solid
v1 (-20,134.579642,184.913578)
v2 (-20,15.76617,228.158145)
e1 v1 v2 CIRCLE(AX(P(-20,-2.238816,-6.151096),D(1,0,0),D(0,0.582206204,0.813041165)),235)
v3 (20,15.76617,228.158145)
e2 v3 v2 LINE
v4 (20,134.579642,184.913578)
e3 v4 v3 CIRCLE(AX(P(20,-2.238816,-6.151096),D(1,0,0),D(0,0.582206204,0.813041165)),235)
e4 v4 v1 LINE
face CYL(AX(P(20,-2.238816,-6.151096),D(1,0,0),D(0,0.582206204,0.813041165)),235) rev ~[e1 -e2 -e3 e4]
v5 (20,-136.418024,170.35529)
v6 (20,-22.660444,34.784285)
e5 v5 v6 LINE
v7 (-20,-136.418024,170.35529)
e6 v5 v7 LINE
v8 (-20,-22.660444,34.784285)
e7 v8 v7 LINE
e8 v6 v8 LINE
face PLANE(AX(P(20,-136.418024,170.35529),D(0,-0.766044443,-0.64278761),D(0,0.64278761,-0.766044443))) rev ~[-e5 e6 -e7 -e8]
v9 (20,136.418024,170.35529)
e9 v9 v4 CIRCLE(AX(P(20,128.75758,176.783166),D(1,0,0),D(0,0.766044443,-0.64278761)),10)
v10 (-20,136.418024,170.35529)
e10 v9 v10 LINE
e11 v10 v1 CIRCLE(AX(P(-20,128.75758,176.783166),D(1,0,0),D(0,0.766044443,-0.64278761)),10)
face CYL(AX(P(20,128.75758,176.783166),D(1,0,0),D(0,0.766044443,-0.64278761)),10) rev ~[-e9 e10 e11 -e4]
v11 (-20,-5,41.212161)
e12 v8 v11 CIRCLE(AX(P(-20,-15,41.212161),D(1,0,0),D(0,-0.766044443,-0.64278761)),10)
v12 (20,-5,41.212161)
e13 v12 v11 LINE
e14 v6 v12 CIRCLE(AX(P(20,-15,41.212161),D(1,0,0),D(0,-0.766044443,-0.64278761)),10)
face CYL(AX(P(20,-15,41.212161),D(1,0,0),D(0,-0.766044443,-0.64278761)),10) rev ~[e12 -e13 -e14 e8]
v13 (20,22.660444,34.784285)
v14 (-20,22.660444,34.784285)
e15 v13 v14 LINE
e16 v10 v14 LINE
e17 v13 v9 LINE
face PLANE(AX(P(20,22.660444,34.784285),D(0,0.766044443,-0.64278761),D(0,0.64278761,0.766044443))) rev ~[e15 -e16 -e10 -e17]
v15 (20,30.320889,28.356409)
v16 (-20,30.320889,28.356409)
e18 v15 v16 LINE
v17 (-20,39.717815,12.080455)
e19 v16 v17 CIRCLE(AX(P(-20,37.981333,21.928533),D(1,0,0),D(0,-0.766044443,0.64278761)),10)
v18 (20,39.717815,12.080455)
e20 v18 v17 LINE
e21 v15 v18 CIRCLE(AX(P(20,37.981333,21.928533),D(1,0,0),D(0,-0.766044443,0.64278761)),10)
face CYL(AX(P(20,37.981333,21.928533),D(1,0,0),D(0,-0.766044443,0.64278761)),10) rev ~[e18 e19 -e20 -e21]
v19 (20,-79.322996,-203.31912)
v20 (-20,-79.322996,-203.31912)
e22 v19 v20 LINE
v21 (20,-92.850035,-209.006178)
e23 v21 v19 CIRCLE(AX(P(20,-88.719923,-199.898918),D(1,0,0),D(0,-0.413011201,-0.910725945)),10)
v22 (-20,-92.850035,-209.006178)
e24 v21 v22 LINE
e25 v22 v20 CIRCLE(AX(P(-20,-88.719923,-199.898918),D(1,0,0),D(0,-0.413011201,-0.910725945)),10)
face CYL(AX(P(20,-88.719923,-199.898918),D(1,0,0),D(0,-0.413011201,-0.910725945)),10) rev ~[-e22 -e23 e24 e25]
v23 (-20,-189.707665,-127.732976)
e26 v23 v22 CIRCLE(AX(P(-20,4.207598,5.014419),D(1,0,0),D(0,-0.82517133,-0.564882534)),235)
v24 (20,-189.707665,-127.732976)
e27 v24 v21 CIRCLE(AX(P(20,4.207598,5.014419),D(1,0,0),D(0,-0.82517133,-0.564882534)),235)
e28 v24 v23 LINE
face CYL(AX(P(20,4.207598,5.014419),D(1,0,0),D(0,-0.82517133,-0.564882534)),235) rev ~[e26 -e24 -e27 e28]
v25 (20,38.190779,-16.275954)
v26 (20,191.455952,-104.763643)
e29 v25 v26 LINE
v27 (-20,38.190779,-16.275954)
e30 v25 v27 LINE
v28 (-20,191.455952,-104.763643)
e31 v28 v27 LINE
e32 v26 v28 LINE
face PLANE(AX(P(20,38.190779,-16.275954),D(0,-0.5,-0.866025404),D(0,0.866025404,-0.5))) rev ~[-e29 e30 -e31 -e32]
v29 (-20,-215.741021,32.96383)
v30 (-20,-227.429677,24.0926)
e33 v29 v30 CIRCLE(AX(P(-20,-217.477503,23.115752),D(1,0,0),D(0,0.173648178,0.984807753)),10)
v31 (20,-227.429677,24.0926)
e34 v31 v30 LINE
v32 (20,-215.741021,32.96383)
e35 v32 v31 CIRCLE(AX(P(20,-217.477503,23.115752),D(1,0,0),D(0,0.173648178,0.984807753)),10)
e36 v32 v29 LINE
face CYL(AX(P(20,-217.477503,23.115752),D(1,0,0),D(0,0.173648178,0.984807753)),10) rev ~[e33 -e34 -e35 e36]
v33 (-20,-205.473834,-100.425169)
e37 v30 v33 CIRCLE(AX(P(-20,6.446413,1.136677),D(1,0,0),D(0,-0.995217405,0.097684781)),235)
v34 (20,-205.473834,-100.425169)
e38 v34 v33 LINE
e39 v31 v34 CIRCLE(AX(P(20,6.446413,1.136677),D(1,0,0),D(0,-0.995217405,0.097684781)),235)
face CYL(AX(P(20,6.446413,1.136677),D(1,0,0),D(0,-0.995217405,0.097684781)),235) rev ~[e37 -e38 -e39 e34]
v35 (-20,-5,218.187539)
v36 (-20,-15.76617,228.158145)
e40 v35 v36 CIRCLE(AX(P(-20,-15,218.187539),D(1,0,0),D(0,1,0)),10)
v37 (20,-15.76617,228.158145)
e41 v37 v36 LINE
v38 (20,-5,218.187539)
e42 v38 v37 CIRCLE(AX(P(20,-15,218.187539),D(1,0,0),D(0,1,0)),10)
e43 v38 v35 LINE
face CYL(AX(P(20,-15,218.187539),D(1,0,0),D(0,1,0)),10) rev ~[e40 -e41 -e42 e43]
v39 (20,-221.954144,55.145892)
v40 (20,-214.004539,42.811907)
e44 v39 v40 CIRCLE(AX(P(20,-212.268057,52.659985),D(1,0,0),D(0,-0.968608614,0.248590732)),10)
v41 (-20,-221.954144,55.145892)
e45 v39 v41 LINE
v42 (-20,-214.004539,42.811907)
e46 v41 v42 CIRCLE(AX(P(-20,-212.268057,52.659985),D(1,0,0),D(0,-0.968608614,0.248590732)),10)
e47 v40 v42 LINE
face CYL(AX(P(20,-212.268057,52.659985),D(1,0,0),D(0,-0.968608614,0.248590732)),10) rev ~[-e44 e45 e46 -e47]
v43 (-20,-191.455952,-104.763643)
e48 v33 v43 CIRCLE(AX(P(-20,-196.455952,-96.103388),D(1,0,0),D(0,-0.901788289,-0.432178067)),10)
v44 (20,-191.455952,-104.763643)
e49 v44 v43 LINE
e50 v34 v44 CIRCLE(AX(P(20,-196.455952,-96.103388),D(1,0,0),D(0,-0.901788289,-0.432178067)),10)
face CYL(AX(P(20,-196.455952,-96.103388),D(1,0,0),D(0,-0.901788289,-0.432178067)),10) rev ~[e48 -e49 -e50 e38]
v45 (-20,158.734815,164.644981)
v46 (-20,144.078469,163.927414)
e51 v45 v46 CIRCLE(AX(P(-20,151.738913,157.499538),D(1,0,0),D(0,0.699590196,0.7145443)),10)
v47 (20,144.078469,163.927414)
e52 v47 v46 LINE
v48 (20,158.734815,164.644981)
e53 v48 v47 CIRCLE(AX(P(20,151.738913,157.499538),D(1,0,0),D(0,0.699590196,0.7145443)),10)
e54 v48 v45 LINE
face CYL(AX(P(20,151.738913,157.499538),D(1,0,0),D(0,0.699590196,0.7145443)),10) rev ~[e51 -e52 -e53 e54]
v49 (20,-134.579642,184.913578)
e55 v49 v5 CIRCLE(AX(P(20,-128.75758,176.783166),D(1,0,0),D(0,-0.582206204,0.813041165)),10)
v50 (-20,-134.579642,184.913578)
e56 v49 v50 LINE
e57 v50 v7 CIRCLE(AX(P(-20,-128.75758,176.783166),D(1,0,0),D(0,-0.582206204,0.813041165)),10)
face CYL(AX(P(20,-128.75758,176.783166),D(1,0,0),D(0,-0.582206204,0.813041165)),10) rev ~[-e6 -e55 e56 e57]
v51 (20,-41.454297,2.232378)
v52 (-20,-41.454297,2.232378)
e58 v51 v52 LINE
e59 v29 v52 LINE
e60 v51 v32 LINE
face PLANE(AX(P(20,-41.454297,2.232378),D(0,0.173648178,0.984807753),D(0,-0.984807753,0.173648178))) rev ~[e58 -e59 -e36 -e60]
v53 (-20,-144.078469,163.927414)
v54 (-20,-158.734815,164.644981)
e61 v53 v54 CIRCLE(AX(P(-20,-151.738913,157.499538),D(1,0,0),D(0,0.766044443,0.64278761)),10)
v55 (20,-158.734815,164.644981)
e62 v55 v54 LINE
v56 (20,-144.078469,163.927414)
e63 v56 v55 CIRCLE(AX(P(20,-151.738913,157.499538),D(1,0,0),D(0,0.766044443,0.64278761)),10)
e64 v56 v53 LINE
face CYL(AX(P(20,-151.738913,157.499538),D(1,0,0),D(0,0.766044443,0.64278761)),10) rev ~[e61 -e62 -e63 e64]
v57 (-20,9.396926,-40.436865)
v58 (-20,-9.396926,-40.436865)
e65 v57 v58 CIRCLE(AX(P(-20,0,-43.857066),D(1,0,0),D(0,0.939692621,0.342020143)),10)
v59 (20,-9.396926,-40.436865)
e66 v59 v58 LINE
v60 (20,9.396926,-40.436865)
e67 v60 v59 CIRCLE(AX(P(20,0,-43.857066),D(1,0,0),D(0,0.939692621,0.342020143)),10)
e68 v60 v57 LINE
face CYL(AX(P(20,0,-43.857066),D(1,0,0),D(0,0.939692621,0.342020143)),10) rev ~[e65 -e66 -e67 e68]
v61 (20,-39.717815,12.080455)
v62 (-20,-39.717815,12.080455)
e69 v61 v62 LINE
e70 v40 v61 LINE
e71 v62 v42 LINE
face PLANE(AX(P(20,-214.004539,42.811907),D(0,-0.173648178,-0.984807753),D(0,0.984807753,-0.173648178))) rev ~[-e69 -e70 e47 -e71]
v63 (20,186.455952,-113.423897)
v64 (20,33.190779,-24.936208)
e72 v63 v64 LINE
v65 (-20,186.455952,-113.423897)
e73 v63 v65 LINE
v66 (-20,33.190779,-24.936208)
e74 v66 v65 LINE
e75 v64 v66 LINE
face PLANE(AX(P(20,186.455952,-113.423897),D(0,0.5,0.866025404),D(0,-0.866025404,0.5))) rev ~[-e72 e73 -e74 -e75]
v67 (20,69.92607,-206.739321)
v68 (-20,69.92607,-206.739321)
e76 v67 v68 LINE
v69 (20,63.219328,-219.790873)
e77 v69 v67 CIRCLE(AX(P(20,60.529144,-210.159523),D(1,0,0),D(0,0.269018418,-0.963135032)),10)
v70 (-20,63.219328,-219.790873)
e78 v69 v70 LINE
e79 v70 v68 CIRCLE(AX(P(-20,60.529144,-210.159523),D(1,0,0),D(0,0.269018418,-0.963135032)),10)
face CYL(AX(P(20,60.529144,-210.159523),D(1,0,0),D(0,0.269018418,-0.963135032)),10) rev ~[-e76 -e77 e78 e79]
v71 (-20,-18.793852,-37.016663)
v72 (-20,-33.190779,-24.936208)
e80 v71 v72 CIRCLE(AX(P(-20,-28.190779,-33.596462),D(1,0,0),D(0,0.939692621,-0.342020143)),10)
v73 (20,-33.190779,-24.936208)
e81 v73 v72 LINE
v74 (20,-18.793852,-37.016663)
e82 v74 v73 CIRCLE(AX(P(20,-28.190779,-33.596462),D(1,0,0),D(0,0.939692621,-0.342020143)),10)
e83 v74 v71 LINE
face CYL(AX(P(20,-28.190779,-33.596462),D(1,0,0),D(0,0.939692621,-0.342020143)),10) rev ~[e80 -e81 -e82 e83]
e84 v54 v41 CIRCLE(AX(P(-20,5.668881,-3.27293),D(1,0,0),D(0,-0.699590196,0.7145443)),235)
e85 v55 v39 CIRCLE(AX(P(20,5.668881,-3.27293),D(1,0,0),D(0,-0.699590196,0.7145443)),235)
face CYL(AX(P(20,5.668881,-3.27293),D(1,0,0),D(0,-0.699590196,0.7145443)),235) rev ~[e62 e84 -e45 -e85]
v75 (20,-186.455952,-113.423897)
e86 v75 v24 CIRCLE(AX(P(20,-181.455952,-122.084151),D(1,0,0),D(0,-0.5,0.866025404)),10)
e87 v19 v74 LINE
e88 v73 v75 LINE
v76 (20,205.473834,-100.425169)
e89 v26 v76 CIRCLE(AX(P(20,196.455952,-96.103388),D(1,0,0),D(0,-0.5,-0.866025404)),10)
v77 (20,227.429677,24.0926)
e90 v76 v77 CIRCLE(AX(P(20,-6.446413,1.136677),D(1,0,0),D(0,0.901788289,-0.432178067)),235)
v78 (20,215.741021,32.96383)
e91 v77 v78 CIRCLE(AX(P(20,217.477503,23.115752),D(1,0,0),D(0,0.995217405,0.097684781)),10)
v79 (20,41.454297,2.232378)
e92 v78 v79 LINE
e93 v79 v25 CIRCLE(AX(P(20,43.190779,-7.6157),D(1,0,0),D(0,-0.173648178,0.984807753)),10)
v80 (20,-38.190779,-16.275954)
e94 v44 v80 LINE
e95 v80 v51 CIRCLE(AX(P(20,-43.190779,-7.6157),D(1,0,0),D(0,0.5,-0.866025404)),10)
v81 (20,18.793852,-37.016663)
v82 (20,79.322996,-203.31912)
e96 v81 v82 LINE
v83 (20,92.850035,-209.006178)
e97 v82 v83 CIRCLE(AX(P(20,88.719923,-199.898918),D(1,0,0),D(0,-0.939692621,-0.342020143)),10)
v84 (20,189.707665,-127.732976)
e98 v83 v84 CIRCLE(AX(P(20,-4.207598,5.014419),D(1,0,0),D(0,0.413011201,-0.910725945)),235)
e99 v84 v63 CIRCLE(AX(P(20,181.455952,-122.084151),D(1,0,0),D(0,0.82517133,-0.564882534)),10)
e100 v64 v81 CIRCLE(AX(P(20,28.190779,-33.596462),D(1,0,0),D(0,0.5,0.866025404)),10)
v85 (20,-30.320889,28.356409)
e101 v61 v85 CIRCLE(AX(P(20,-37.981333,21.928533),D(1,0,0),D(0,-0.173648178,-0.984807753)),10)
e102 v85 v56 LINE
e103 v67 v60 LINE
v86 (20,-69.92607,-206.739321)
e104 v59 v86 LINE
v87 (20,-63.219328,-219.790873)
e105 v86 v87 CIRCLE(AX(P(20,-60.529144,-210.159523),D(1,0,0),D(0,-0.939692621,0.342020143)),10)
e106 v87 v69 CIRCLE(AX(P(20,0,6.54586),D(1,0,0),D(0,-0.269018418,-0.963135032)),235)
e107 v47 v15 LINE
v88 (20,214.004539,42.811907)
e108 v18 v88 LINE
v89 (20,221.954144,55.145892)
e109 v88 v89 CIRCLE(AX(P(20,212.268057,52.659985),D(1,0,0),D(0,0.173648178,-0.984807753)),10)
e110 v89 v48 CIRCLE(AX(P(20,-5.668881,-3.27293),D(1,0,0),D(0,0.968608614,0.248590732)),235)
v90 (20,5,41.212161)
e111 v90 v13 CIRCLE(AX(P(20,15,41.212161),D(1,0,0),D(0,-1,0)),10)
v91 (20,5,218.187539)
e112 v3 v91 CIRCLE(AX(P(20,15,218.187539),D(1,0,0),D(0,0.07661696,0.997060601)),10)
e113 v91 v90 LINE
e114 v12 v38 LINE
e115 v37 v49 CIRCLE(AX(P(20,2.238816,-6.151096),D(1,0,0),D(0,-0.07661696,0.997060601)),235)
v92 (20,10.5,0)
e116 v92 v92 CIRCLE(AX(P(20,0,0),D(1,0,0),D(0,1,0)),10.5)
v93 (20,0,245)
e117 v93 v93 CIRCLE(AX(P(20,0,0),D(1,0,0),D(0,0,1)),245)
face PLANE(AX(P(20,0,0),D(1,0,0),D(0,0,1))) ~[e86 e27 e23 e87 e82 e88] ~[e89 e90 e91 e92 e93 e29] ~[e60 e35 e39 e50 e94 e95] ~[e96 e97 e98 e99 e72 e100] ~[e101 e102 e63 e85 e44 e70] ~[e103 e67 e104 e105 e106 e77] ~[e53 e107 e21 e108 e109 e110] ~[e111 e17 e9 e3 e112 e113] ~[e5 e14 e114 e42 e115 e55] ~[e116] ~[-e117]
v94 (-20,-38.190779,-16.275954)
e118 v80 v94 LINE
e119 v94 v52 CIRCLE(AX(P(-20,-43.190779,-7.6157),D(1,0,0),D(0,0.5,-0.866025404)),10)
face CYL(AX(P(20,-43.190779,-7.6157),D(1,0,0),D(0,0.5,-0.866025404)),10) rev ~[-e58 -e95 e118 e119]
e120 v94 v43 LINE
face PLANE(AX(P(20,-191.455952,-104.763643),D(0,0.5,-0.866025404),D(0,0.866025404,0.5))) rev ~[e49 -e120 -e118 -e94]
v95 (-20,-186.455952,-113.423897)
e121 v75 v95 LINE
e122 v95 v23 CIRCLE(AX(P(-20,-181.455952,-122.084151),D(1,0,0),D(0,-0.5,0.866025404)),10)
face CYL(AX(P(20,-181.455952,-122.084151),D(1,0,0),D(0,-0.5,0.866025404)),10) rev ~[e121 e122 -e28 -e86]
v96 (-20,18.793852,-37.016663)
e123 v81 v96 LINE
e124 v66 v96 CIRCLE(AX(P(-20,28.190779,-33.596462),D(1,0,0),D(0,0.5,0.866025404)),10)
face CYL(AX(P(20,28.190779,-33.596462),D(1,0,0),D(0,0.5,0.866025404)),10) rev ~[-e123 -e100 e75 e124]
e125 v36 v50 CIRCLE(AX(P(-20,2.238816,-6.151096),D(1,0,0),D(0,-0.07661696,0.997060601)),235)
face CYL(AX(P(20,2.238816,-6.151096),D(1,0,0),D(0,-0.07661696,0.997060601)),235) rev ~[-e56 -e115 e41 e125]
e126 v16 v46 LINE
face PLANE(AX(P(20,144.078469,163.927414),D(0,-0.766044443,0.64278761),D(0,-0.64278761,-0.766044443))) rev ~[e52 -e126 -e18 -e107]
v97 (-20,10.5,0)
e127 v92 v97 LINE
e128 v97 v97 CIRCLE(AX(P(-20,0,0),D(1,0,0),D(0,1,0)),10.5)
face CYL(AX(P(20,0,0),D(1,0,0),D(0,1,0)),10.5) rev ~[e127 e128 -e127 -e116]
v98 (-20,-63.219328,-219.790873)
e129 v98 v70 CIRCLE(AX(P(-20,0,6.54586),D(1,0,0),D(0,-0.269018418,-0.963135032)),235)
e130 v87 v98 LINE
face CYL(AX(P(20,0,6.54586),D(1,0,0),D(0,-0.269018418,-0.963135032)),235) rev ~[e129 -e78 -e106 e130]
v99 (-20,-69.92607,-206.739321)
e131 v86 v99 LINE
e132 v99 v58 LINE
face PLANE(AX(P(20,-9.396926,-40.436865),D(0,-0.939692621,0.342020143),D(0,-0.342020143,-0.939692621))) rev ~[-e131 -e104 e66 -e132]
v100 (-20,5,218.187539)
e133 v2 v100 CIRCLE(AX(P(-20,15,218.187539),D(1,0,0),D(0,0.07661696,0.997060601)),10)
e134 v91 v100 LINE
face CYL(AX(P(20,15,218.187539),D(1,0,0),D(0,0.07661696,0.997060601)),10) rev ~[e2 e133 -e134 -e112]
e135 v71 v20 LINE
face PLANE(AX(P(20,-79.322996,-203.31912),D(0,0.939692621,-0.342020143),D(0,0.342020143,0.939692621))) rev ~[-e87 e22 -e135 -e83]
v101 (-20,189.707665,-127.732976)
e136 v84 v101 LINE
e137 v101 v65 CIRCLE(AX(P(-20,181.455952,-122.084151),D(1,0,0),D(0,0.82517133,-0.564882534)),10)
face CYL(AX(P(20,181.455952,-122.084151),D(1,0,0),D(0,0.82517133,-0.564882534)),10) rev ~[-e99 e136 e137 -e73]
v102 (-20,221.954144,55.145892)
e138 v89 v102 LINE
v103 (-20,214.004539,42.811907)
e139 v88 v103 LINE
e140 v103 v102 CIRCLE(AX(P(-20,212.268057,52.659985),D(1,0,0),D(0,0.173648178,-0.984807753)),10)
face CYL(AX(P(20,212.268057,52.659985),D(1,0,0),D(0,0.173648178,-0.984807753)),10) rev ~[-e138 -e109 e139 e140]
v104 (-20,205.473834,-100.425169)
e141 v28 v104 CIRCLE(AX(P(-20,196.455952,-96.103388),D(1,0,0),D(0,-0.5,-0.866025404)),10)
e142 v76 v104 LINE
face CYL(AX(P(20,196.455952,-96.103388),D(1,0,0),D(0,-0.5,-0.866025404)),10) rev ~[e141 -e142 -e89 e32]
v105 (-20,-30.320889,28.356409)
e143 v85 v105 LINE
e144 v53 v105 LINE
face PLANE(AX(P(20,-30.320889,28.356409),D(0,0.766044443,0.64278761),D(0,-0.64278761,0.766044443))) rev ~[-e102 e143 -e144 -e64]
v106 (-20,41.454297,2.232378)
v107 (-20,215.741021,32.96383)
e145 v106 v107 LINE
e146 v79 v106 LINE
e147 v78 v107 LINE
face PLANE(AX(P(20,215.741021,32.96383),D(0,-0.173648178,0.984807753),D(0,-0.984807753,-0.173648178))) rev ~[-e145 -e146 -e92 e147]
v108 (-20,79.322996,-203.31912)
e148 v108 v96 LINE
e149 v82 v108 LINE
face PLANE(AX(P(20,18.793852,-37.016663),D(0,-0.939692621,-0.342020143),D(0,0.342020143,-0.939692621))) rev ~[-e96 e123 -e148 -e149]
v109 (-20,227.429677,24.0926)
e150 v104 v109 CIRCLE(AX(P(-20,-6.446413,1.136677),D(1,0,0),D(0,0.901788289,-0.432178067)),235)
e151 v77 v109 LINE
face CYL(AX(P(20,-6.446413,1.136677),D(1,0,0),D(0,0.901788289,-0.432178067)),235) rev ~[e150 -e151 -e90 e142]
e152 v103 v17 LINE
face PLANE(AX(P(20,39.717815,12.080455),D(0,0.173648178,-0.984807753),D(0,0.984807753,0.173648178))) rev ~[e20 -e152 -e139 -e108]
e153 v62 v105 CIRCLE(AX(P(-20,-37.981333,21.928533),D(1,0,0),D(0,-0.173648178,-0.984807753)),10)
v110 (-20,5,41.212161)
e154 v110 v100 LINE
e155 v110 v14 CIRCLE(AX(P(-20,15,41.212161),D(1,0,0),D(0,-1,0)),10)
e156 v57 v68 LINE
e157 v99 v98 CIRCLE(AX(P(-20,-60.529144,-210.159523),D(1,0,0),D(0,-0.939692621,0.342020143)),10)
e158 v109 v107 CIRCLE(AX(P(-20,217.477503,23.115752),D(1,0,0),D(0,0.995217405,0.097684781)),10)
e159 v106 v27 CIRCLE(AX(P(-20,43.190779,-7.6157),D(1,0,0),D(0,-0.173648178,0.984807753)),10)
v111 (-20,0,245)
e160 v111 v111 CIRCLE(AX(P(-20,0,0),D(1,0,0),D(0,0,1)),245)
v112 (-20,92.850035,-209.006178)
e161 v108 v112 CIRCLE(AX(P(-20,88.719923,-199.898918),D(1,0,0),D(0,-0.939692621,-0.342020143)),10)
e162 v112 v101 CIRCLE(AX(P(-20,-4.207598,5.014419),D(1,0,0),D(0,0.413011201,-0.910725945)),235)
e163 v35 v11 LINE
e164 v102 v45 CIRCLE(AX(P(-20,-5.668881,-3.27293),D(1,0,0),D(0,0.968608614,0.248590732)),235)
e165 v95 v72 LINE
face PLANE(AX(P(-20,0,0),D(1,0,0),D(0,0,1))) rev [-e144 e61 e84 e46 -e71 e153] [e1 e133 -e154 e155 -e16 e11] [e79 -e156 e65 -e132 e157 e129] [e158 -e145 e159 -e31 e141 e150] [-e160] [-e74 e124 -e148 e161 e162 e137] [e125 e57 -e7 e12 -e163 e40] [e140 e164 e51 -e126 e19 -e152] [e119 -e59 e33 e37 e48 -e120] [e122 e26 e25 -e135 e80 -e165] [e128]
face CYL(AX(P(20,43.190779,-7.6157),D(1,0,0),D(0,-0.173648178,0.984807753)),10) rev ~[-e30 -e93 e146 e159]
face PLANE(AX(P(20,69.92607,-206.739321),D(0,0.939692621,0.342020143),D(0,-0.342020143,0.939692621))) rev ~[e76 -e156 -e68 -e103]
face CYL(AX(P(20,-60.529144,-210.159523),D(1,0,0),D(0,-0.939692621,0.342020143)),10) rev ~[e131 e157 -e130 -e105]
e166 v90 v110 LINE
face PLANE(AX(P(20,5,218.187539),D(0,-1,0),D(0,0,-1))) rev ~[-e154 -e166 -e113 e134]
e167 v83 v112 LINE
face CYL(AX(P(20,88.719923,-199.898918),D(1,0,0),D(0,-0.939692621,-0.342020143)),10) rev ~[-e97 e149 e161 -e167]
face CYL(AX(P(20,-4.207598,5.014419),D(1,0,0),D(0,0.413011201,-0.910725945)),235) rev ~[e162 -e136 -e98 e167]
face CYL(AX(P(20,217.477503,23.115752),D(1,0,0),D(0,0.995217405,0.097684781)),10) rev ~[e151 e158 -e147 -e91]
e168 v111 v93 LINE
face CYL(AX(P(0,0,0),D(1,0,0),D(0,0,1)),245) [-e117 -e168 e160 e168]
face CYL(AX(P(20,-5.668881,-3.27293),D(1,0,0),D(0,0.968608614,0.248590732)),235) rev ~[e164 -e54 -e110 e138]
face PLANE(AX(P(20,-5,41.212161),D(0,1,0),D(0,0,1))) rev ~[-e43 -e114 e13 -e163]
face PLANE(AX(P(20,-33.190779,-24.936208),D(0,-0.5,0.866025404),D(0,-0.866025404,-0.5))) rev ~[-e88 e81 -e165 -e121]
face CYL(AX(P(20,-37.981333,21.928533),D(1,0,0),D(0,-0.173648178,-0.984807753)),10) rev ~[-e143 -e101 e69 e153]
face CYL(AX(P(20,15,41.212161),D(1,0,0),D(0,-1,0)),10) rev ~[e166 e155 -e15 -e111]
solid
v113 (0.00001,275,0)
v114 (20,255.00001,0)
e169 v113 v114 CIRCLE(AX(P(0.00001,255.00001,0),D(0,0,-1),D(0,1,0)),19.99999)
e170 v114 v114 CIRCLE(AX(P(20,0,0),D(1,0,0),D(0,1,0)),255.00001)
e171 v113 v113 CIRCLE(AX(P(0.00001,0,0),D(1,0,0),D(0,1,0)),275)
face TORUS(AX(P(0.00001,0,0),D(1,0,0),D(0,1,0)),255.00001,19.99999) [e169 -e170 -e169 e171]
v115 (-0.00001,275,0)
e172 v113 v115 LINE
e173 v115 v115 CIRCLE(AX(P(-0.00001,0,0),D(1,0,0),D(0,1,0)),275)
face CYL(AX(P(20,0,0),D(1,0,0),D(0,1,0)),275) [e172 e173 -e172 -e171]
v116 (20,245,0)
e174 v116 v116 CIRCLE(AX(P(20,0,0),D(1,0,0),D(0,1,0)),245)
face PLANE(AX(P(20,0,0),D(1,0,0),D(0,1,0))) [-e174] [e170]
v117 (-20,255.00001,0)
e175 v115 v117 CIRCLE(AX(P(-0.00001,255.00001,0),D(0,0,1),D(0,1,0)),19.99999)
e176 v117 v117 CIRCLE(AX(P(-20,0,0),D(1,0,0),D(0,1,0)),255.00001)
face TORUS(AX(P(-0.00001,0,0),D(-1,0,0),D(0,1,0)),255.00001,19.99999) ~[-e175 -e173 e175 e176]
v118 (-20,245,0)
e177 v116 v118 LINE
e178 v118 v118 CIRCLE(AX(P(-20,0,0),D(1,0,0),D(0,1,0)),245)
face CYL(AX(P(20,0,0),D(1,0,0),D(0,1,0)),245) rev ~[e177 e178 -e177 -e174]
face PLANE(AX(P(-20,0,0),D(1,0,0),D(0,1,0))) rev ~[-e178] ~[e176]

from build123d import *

# Parameters (mm, degrees)
F0_W     = 40
F0_H     = 245
F3_R     = 10.5
F4_DEPTH = 79
F5_R     = 275
F5_R_2   = 245
F6_DEPTH = 40
F7_R     = 19.99999


# Not quite as in the source:
# - a fillet or chamfer is up to 0.001 mm smaller than in the source, because OpenCascade refuses the exact size


with BuildPart() as f1:
    # F0 (on Front) → F1 (revolve)
    with BuildSketch(Plane.XZ):
        with Locations((0, 122.5)):
            Rectangle(F0_W, F0_H)
    revolve(axis=Axis((0, 0, 0), (1, 0, 0)))

    # F3 (on face) → F4 (cut)
    with BuildSketch(Plane.YZ.offset(20)):
        with BuildLine():
            ThreePointArc((15.7661695952, 228.1581450576), (8.205211407, 225.524489914), (5, 218.1875390503))
            Line((5, 218.1875390503), (5, 41.2121612918))
            ThreePointArc((5, 41.2121612918), (11.5797985667, 31.815235084), (22.6604444312, 34.784285195))
            Line((22.6604444312, 34.784285195), (136.418024474, 170.3552898957))
            ThreePointArc((136.418024474, 170.3552898957), (138.6787911947, 178.0359905131), (134.5796420844, 184.9135776417))
            ThreePointArc((134.5796420844, 184.9135776417), (78.1359177886, 214.6766697724), (15.7661695952, 228.1581450576))
        make_face()
        with BuildLine():
            ThreePointArc((-5, 218.1875390503), (-8.205211407, 225.524489914), (-15.7661695952, 228.1581450576))
            ThreePointArc((-15.7661695952, 228.1581450576), (-78.1359177886, 214.6766697724), (-134.5796420844, 184.9135776417))
            ThreePointArc((-134.5796420844, 184.9135776417), (-138.6787911947, 178.0359905131), (-136.418024474, 170.3552898957))
            Line((-136.418024474, 170.3552898957), (-22.6604444312, 34.784285195))
            ThreePointArc((-22.6604444312, 34.784285195), (-11.5797985667, 31.815235084), (-5, 41.2121612918))
            Line((-5, 41.2121612918), (-5, 218.1875390503))
        make_face()
        with BuildLine():
            ThreePointArc((-144.0784689051, 163.9274137989), (-151.2499044005, 167.4875740586), (-158.7348152998, 164.6449807056))
            ThreePointArc((-158.7348152998, 164.6449807056), (-197.8470890484, 114.2270701205), (-221.9541435466, 55.1458921618))
            ThreePointArc((-221.9541435466, 55.1458921618), (-220.6734461533, 47.2424725015), (-214.0045391791, 42.8119073108))
            Line((-214.0045391791, 42.8119073108), (-39.7178150702, 12.0804554711))
            ThreePointArc((-39.7178150702, 12.0804554711), (-29.3210792557, 16.9285330012), (-30.3208888624, 28.3564090981))
            Line((-30.3208888624, 28.3564090981), (-144.0784689051, 163.9274137989))
        make_face()
        with BuildLine():
            ThreePointArc((-215.7410209558, 32.9638297807), (-223.5230861696, 31.0813608841), (-227.4296767846, 24.0926000564))
            ThreePointArc((-227.4296767846, 24.0926000564), (-224.9834085171, -39.6706451333), (-205.4738344978, -100.4251691389))
            ThreePointArc((-205.4738344978, -100.4251691389), (-199.4125431446, -105.6563234351), (-191.4559516068, -104.7636425062))
            Line((-191.4559516068, -104.7636425062), (-38.1907786236, -16.275953627))
            ThreePointArc((-38.1907786236, -16.275953627), (-33.3427010935, -5.8792178125), (-41.4542968469, 2.232377941))
            Line((-41.4542968469, 2.232377941), (-215.7410209558, 32.9638297807))
        make_face()
        with BuildLine():
            ThreePointArc((-186.4559516068, -113.4238965441), (-191.2073317376, -119.8681664789), (-189.7076649026, -127.7329759186))
            ThreePointArc((-189.7076649026, -127.7329759186), (-146.8474907285, -175.0060246391), (-92.8500347002, -209.0061776981))
            ThreePointArc((-92.8500347002, -209.0061776981), (-84.844294975, -209.1173513973), (-79.3229964818, -203.3191196764))
            Line((-79.3229964818, -203.3191196764), (-18.7938524157, -37.0166631359))
            ThreePointArc((-18.7938524157, -37.0166631359), (-21.7629025267, -25.9360172715), (-33.1907786236, -24.9362076648))
            Line((-33.1907786236, -24.9362076648), (-186.4559516068, -113.4238965441))
        make_face()
        with BuildLine():
            ThreePointArc((-69.9260702739, -206.7393211097), (-69.4235417527, -214.7300465601), (-63.2193282468, -219.7908728675))
            ThreePointArc((-63.2193282468, -219.7908728675), (0, -228.454140241), (63.2193282468, -219.7908728675))
            ThreePointArc((63.2193282468, -219.7908728675), (69.4235417527, -214.7300465601), (69.9260702739, -206.7393211097))
            Line((69.9260702739, -206.7393211097), (9.3969262079, -40.4368645692))
            ThreePointArc((9.3969262079, -40.4368645692), (0, -33.8570660024), (-9.3969262079, -40.4368645692))
            Line((-9.3969262079, -40.4368645692), (-69.9260702739, -206.7393211097))
        make_face()
        with BuildLine():
            ThreePointArc((79.3229964818, -203.3191196764), (84.844294975, -209.1173513973), (92.8500347002, -209.0061776981))
            ThreePointArc((92.8500347002, -209.0061776981), (146.8474907285, -175.0060246391), (189.7076649026, -127.7329759186))
            ThreePointArc((189.7076649026, -127.7329759186), (191.2073317376, -119.8681664789), (186.4559516068, -113.4238965441))
            Line((186.4559516068, -113.4238965441), (33.1907786236, -24.9362076648))
            ThreePointArc((33.1907786236, -24.9362076648), (21.7629025267, -25.9360172715), (18.7938524157, -37.0166631359))
            Line((18.7938524157, -37.0166631359), (79.3229964818, -203.3191196764))
        make_face()
        with BuildLine():
            ThreePointArc((191.4559516068, -104.7636425062), (199.4125431446, -105.6563234351), (205.4738344978, -100.4251691389))
            ThreePointArc((205.4738344978, -100.4251691389), (224.9834085171, -39.6706451333), (227.4296767846, 24.0926000564))
            ThreePointArc((227.4296767846, 24.0926000564), (223.5230861696, 31.0813608841), (215.7410209558, 32.9638297807))
            Line((215.7410209558, 32.9638297807), (41.4542968469, 2.232377941))
            ThreePointArc((41.4542968469, 2.232377941), (33.3427010935, -5.8792178125), (38.1907786236, -16.275953627))
            Line((38.1907786236, -16.275953627), (191.4559516068, -104.7636425062))
        make_face()
        with BuildLine():
            ThreePointArc((214.0045391791, 42.8119073108), (220.6734461533, 47.2424725015), (221.9541435466, 55.1458921618))
            ThreePointArc((221.9541435466, 55.1458921618), (197.8470890484, 114.2270701205), (158.7348152998, 164.6449807056))
            ThreePointArc((158.7348152998, 164.6449807056), (151.2499044005, 167.4875740586), (144.0784689051, 163.9274137989))
            Line((144.0784689051, 163.9274137989), (30.3208888624, 28.3564090981))
            ThreePointArc((30.3208888624, 28.3564090981), (29.3210792557, 16.9285330012), (39.7178150702, 12.0804554711))
            Line((39.7178150702, 12.0804554711), (214.0045391791, 42.8119073108))
        make_face()
        Circle(F3_R)
    extrude(amount=-F4_DEPTH, mode=Mode.SUBTRACT)


with BuildPart() as f6:
    # F5 (on face) → F6 (new body)
    with BuildSketch(Plane.YZ.offset(20)):
        Circle(F5_R)
        Circle(F5_R_2, mode=Mode.SUBTRACT)
    extrude(amount=-F6_DEPTH)

    # F7 (radius 20 in the source; OpenCascade refuses exactly that, so slightly less here)
    f7_edges = [f6.edges().sort_by_distance(p)[0] for p in [
        (-20, -275, 0),
        (20, -275, 0),
    ]]
    fillet(f7_edges, radius=F7_R)


solid = Compound([f1.part, f6.part])
